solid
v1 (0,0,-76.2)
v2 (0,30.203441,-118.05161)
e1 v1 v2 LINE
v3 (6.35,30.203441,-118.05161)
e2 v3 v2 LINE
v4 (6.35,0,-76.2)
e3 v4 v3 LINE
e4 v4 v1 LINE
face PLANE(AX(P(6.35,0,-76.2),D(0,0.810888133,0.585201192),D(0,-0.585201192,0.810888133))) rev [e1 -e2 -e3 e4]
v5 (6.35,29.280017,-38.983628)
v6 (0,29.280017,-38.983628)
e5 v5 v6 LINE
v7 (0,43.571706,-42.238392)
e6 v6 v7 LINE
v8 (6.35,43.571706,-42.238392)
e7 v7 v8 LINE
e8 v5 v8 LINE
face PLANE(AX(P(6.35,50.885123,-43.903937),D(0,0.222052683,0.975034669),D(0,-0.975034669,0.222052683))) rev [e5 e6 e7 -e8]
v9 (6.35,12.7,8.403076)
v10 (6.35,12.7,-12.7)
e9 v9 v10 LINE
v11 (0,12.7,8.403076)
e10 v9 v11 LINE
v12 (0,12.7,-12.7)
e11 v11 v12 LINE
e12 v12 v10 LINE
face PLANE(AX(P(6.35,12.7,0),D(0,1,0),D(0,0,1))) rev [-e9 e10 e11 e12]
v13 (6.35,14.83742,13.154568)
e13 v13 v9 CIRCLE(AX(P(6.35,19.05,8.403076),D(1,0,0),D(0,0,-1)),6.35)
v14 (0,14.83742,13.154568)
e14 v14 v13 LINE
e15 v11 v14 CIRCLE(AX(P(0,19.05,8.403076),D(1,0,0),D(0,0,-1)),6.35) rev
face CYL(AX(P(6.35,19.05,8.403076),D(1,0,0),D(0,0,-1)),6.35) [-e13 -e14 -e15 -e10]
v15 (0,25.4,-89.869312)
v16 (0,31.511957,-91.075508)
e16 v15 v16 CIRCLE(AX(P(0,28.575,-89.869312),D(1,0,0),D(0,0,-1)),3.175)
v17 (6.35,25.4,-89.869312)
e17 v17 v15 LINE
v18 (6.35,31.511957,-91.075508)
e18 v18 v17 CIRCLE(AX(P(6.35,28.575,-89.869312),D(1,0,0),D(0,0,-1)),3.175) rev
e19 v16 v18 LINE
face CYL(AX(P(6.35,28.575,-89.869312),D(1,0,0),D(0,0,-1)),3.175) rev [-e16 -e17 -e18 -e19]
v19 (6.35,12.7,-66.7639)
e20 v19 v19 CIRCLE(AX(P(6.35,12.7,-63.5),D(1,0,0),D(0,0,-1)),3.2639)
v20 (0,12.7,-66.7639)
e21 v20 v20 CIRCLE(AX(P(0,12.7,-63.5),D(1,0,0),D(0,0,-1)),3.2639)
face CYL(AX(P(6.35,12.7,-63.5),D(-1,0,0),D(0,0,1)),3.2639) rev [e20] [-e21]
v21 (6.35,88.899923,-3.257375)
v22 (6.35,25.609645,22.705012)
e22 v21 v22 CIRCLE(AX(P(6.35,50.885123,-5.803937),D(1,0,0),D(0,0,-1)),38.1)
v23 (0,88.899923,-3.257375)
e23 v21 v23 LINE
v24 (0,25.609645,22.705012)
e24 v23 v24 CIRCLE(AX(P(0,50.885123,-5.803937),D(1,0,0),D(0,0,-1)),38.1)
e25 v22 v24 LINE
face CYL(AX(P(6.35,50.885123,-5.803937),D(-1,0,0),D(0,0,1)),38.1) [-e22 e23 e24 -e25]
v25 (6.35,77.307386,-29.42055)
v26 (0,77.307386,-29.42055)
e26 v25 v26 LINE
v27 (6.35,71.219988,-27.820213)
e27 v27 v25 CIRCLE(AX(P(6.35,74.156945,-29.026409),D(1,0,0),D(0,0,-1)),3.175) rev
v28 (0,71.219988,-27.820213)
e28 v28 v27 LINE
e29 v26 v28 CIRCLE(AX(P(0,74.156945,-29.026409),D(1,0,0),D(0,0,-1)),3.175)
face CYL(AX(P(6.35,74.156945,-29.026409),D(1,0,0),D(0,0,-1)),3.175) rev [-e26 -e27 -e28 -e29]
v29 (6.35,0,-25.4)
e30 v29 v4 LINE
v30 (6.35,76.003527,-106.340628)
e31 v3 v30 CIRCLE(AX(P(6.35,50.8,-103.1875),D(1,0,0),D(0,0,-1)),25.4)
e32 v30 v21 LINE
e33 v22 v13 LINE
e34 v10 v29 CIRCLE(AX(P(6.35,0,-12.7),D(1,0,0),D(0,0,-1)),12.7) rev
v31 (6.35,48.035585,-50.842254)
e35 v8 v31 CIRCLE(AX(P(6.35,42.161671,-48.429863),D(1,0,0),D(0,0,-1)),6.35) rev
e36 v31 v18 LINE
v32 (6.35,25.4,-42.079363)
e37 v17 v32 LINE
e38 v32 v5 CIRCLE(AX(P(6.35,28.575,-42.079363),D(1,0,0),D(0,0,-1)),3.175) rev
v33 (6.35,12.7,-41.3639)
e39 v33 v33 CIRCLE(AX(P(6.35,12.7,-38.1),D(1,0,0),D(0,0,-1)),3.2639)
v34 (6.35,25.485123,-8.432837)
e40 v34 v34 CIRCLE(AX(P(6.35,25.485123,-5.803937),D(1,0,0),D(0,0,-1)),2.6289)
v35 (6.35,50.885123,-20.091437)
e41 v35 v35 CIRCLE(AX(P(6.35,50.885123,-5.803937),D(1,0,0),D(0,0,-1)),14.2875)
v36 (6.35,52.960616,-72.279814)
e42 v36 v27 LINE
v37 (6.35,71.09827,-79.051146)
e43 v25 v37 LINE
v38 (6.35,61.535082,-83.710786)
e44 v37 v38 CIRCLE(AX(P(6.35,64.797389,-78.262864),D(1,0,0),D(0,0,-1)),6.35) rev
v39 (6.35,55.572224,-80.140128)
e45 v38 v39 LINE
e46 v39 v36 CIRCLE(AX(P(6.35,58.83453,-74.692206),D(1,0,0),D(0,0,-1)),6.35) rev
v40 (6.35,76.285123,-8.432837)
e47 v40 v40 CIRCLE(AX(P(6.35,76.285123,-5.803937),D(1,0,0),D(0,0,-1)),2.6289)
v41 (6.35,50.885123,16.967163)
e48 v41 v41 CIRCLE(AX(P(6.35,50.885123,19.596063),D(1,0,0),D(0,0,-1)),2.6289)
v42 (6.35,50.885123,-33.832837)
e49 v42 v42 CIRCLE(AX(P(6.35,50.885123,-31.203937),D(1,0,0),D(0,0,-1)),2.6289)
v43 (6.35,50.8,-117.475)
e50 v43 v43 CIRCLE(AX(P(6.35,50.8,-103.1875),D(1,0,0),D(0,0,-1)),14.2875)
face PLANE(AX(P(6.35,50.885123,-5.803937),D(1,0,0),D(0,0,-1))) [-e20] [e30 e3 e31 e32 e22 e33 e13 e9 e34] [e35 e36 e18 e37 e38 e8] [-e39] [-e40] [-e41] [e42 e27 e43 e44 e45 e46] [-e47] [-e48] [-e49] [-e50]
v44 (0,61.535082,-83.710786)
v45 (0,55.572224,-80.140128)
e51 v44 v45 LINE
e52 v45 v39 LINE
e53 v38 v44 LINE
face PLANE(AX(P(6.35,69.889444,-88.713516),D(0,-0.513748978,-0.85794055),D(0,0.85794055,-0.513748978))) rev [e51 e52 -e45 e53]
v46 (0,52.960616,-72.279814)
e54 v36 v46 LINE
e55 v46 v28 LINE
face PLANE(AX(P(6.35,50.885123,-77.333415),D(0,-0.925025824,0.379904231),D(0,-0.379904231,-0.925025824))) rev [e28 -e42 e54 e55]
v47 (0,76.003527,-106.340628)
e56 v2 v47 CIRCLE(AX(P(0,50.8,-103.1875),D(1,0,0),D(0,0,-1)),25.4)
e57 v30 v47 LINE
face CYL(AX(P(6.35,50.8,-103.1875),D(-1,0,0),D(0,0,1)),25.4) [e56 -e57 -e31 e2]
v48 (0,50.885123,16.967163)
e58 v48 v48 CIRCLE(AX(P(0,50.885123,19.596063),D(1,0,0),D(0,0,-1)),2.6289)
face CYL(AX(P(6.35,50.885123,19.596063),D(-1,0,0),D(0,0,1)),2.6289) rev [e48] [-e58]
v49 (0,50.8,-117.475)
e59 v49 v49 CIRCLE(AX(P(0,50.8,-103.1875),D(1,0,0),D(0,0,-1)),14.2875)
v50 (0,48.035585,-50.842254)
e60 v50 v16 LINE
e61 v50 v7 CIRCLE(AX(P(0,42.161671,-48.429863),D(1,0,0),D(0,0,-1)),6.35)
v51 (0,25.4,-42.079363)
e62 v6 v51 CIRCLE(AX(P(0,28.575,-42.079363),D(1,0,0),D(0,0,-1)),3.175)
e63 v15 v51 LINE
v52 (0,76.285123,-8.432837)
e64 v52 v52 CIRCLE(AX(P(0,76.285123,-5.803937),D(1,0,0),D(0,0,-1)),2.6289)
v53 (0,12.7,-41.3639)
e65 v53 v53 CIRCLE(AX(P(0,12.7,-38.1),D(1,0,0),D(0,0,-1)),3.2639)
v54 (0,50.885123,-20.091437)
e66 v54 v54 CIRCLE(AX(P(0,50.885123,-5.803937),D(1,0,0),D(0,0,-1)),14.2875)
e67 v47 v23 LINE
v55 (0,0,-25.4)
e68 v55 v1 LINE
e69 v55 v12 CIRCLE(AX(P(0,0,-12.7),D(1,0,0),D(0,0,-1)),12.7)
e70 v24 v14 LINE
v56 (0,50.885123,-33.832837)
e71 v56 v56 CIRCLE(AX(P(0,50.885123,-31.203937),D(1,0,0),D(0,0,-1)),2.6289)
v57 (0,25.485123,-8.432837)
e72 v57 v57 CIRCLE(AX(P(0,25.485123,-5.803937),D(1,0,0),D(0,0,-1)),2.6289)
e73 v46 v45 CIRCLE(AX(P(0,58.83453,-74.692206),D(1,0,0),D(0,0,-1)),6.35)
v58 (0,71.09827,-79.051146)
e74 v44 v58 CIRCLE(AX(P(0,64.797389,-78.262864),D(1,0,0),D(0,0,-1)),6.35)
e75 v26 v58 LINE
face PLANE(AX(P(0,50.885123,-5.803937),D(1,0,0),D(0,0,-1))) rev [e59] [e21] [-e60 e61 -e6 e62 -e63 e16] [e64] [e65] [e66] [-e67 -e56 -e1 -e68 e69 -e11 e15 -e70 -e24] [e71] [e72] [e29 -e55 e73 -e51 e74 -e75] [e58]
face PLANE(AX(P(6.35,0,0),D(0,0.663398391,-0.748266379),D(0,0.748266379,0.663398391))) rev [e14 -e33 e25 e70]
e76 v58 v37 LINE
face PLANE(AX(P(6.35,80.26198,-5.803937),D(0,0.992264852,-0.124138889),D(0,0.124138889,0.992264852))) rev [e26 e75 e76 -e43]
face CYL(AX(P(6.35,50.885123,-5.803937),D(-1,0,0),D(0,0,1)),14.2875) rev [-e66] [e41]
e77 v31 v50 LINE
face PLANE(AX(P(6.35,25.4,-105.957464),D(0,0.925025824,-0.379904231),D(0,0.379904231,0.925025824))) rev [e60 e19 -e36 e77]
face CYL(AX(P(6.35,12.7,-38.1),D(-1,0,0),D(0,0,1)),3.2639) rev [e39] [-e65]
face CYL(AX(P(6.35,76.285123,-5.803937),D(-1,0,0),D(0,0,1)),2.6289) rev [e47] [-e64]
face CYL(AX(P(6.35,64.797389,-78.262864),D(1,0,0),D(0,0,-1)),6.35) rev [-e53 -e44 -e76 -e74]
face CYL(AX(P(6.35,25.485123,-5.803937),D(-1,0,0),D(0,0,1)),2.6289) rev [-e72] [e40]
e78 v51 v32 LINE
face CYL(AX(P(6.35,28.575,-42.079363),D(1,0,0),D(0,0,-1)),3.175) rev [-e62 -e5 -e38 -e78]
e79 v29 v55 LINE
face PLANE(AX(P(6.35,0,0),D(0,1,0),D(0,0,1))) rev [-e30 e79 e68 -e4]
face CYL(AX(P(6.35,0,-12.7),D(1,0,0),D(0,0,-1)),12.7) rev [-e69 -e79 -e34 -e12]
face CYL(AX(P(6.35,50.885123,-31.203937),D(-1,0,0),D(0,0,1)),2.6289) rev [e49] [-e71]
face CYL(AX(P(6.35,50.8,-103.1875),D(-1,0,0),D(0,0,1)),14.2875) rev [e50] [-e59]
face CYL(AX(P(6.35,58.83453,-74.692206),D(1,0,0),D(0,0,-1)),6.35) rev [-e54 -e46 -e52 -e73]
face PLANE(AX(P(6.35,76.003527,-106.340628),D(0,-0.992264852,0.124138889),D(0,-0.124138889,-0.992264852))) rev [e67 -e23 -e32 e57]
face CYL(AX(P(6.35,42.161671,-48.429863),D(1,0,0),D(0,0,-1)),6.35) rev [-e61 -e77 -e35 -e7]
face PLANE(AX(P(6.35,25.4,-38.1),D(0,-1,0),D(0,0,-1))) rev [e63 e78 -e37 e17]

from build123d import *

# Parameters (mm, degrees)
SKETCH1_R           = 3.2639
SKETCH1_R_2         = 14.2875
SKETCH1_R_3         = 2.6289
BOSS_EXTRUDE1_DEPTH = 6.35
CUT_EXTRUDE1_DEPTH  = 6.35
CUT_EXTRUDE2_DEPTH  = 157.455309971
FILLET1_R           = 6.35
FILLET2_R           = 6.35
FILLET3_R           = 3.175
FILLET4_R           = 6.35
FILLET5_R           = 3.175
FILLET6_R           = 3.175
FILLET7_R           = 12.7
FILLET8_R           = 6.35


with BuildPart() as part:
    # Sketch1 → Boss-Extrude1 (new body)
    with BuildSketch(Plane(origin=(0, 0, 0), x_dir=(0, 0, -1), z_dir=(1, 0, 0))):
        with BuildLine():
            Line((0, 0), (76.2, 0))
            Line((76.2, 0), (118.05161028, 30.203441414))
            ThreePointArc((118.05161028, 30.203441414), (127.79577467, 57.092282399), (106.340627785, 76.003527237))
            Line((106.340627785, 76.003527237), (3.257374761, 88.899923295))
            ThreePointArc((3.257374761, 88.899923295), (-29.445545679, 65.344858986), (-22.705011853, 25.609644583))
            Line((-22.705011853, 25.609644583), (0, 0))
        make_face()
        with Locations((38.1, 12.7)):
            Circle(SKETCH1_R, mode=Mode.SUBTRACT)
        with Locations((63.5, 12.7)):
            Circle(SKETCH1_R, mode=Mode.SUBTRACT)
        with Locations((103.1875, 50.8)):
            Circle(SKETCH1_R_2, mode=Mode.SUBTRACT)
        with Locations((5.803937203, 50.885123286)):
            Circle(SKETCH1_R_2, mode=Mode.SUBTRACT)
        with Locations((5.803937203, 76.285123286)):
            Circle(SKETCH1_R_3, mode=Mode.SUBTRACT)
        with Locations((5.803937203, 25.485123286)):
            Circle(SKETCH1_R_3, mode=Mode.SUBTRACT)
        with Locations((31.203937203, 50.885123286)):
            Circle(SKETCH1_R_3, mode=Mode.SUBTRACT)
        with Locations((-19.596062797, 50.885123286)):
            Circle(SKETCH1_R_3, mode=Mode.SUBTRACT)
    extrude(amount=BOSS_EXTRUDE1_DEPTH)

    # Sketch2 → Cut-Extrude1 (cut)
    with BuildSketch(Plane.ZY):
        Polygon((0, 0), (-25.4, 0), (-25.4, 12.7), (0, 12.7), (11.95076388, 12.7), (11.95076388, 0), align=None)
    extrude(amount=-CUT_EXTRUDE1_DEPTH, mode=Mode.SUBTRACT)

    # Sketch3 → Cut-Extrude2 (cut, through all)
    with BuildSketch(Plane.ZY):
        Polygon((-105.957463546, 25.4), (-43.903937203, 50.885123286), (-38.1, 25.4), align=None)
        Polygon((-88.713516137, 69.889443956), (-77.333414898, 50.885123286), (-5.803937203, 80.261980092), align=None)
    extrude(amount=-CUT_EXTRUDE2_DEPTH, mode=Mode.SUBTRACT)

    # Fillet1
    fillet1_edges = [part.edges().sort_by_distance(p)[0] for p in [
        (3.175, 50.885123286, -77.333414898),
    ]]
    fillet(fillet1_edges, radius=FILLET1_R)

    # Fillet2
    fillet2_edges = [part.edges().sort_by_distance(p)[0] for p in [
        (3.175, 69.889443956, -88.713516137),
    ]]
    fillet(fillet2_edges, radius=FILLET2_R)

    # Fillet3
    fillet3_edges = [part.edges().sort_by_distance(p)[0] for p in [
        (3.175, 80.261980092, -5.803937203),
    ]]
    fillet(fillet3_edges, radius=FILLET3_R)

    # Fillet4
    fillet4_edges = [part.edges().sort_by_distance(p)[0] for p in [
        (3.175, 50.885123286, -43.903937203),
    ]]
    fillet(fillet4_edges, radius=FILLET4_R)

    # Fillet5
    fillet5_edges = [part.edges().sort_by_distance(p)[0] for p in [
        (3.175, 25.4, -38.1),
    ]]
    fillet(fillet5_edges, radius=FILLET5_R)

    # Fillet6
    fillet6_edges = [part.edges().sort_by_distance(p)[0] for p in [
        (3.175, 25.4, -105.957463546),
    ]]
    fillet(fillet6_edges, radius=FILLET6_R)

    # Fillet7
    fillet7_edges = [part.edges().sort_by_distance(p)[0] for p in [
        (3.175, 12.7, -25.4),
    ]]
    fillet(fillet7_edges, radius=FILLET7_R - 0.0001)  # a hair under: the kernel refuses the full size

    # Fillet8
    fillet8_edges = [part.edges().sort_by_distance(p)[0] for p in [
        (3.175, 12.7, 11.259572526),
    ]]
    fillet(fillet8_edges, radius=FILLET8_R)


solid = part.part
